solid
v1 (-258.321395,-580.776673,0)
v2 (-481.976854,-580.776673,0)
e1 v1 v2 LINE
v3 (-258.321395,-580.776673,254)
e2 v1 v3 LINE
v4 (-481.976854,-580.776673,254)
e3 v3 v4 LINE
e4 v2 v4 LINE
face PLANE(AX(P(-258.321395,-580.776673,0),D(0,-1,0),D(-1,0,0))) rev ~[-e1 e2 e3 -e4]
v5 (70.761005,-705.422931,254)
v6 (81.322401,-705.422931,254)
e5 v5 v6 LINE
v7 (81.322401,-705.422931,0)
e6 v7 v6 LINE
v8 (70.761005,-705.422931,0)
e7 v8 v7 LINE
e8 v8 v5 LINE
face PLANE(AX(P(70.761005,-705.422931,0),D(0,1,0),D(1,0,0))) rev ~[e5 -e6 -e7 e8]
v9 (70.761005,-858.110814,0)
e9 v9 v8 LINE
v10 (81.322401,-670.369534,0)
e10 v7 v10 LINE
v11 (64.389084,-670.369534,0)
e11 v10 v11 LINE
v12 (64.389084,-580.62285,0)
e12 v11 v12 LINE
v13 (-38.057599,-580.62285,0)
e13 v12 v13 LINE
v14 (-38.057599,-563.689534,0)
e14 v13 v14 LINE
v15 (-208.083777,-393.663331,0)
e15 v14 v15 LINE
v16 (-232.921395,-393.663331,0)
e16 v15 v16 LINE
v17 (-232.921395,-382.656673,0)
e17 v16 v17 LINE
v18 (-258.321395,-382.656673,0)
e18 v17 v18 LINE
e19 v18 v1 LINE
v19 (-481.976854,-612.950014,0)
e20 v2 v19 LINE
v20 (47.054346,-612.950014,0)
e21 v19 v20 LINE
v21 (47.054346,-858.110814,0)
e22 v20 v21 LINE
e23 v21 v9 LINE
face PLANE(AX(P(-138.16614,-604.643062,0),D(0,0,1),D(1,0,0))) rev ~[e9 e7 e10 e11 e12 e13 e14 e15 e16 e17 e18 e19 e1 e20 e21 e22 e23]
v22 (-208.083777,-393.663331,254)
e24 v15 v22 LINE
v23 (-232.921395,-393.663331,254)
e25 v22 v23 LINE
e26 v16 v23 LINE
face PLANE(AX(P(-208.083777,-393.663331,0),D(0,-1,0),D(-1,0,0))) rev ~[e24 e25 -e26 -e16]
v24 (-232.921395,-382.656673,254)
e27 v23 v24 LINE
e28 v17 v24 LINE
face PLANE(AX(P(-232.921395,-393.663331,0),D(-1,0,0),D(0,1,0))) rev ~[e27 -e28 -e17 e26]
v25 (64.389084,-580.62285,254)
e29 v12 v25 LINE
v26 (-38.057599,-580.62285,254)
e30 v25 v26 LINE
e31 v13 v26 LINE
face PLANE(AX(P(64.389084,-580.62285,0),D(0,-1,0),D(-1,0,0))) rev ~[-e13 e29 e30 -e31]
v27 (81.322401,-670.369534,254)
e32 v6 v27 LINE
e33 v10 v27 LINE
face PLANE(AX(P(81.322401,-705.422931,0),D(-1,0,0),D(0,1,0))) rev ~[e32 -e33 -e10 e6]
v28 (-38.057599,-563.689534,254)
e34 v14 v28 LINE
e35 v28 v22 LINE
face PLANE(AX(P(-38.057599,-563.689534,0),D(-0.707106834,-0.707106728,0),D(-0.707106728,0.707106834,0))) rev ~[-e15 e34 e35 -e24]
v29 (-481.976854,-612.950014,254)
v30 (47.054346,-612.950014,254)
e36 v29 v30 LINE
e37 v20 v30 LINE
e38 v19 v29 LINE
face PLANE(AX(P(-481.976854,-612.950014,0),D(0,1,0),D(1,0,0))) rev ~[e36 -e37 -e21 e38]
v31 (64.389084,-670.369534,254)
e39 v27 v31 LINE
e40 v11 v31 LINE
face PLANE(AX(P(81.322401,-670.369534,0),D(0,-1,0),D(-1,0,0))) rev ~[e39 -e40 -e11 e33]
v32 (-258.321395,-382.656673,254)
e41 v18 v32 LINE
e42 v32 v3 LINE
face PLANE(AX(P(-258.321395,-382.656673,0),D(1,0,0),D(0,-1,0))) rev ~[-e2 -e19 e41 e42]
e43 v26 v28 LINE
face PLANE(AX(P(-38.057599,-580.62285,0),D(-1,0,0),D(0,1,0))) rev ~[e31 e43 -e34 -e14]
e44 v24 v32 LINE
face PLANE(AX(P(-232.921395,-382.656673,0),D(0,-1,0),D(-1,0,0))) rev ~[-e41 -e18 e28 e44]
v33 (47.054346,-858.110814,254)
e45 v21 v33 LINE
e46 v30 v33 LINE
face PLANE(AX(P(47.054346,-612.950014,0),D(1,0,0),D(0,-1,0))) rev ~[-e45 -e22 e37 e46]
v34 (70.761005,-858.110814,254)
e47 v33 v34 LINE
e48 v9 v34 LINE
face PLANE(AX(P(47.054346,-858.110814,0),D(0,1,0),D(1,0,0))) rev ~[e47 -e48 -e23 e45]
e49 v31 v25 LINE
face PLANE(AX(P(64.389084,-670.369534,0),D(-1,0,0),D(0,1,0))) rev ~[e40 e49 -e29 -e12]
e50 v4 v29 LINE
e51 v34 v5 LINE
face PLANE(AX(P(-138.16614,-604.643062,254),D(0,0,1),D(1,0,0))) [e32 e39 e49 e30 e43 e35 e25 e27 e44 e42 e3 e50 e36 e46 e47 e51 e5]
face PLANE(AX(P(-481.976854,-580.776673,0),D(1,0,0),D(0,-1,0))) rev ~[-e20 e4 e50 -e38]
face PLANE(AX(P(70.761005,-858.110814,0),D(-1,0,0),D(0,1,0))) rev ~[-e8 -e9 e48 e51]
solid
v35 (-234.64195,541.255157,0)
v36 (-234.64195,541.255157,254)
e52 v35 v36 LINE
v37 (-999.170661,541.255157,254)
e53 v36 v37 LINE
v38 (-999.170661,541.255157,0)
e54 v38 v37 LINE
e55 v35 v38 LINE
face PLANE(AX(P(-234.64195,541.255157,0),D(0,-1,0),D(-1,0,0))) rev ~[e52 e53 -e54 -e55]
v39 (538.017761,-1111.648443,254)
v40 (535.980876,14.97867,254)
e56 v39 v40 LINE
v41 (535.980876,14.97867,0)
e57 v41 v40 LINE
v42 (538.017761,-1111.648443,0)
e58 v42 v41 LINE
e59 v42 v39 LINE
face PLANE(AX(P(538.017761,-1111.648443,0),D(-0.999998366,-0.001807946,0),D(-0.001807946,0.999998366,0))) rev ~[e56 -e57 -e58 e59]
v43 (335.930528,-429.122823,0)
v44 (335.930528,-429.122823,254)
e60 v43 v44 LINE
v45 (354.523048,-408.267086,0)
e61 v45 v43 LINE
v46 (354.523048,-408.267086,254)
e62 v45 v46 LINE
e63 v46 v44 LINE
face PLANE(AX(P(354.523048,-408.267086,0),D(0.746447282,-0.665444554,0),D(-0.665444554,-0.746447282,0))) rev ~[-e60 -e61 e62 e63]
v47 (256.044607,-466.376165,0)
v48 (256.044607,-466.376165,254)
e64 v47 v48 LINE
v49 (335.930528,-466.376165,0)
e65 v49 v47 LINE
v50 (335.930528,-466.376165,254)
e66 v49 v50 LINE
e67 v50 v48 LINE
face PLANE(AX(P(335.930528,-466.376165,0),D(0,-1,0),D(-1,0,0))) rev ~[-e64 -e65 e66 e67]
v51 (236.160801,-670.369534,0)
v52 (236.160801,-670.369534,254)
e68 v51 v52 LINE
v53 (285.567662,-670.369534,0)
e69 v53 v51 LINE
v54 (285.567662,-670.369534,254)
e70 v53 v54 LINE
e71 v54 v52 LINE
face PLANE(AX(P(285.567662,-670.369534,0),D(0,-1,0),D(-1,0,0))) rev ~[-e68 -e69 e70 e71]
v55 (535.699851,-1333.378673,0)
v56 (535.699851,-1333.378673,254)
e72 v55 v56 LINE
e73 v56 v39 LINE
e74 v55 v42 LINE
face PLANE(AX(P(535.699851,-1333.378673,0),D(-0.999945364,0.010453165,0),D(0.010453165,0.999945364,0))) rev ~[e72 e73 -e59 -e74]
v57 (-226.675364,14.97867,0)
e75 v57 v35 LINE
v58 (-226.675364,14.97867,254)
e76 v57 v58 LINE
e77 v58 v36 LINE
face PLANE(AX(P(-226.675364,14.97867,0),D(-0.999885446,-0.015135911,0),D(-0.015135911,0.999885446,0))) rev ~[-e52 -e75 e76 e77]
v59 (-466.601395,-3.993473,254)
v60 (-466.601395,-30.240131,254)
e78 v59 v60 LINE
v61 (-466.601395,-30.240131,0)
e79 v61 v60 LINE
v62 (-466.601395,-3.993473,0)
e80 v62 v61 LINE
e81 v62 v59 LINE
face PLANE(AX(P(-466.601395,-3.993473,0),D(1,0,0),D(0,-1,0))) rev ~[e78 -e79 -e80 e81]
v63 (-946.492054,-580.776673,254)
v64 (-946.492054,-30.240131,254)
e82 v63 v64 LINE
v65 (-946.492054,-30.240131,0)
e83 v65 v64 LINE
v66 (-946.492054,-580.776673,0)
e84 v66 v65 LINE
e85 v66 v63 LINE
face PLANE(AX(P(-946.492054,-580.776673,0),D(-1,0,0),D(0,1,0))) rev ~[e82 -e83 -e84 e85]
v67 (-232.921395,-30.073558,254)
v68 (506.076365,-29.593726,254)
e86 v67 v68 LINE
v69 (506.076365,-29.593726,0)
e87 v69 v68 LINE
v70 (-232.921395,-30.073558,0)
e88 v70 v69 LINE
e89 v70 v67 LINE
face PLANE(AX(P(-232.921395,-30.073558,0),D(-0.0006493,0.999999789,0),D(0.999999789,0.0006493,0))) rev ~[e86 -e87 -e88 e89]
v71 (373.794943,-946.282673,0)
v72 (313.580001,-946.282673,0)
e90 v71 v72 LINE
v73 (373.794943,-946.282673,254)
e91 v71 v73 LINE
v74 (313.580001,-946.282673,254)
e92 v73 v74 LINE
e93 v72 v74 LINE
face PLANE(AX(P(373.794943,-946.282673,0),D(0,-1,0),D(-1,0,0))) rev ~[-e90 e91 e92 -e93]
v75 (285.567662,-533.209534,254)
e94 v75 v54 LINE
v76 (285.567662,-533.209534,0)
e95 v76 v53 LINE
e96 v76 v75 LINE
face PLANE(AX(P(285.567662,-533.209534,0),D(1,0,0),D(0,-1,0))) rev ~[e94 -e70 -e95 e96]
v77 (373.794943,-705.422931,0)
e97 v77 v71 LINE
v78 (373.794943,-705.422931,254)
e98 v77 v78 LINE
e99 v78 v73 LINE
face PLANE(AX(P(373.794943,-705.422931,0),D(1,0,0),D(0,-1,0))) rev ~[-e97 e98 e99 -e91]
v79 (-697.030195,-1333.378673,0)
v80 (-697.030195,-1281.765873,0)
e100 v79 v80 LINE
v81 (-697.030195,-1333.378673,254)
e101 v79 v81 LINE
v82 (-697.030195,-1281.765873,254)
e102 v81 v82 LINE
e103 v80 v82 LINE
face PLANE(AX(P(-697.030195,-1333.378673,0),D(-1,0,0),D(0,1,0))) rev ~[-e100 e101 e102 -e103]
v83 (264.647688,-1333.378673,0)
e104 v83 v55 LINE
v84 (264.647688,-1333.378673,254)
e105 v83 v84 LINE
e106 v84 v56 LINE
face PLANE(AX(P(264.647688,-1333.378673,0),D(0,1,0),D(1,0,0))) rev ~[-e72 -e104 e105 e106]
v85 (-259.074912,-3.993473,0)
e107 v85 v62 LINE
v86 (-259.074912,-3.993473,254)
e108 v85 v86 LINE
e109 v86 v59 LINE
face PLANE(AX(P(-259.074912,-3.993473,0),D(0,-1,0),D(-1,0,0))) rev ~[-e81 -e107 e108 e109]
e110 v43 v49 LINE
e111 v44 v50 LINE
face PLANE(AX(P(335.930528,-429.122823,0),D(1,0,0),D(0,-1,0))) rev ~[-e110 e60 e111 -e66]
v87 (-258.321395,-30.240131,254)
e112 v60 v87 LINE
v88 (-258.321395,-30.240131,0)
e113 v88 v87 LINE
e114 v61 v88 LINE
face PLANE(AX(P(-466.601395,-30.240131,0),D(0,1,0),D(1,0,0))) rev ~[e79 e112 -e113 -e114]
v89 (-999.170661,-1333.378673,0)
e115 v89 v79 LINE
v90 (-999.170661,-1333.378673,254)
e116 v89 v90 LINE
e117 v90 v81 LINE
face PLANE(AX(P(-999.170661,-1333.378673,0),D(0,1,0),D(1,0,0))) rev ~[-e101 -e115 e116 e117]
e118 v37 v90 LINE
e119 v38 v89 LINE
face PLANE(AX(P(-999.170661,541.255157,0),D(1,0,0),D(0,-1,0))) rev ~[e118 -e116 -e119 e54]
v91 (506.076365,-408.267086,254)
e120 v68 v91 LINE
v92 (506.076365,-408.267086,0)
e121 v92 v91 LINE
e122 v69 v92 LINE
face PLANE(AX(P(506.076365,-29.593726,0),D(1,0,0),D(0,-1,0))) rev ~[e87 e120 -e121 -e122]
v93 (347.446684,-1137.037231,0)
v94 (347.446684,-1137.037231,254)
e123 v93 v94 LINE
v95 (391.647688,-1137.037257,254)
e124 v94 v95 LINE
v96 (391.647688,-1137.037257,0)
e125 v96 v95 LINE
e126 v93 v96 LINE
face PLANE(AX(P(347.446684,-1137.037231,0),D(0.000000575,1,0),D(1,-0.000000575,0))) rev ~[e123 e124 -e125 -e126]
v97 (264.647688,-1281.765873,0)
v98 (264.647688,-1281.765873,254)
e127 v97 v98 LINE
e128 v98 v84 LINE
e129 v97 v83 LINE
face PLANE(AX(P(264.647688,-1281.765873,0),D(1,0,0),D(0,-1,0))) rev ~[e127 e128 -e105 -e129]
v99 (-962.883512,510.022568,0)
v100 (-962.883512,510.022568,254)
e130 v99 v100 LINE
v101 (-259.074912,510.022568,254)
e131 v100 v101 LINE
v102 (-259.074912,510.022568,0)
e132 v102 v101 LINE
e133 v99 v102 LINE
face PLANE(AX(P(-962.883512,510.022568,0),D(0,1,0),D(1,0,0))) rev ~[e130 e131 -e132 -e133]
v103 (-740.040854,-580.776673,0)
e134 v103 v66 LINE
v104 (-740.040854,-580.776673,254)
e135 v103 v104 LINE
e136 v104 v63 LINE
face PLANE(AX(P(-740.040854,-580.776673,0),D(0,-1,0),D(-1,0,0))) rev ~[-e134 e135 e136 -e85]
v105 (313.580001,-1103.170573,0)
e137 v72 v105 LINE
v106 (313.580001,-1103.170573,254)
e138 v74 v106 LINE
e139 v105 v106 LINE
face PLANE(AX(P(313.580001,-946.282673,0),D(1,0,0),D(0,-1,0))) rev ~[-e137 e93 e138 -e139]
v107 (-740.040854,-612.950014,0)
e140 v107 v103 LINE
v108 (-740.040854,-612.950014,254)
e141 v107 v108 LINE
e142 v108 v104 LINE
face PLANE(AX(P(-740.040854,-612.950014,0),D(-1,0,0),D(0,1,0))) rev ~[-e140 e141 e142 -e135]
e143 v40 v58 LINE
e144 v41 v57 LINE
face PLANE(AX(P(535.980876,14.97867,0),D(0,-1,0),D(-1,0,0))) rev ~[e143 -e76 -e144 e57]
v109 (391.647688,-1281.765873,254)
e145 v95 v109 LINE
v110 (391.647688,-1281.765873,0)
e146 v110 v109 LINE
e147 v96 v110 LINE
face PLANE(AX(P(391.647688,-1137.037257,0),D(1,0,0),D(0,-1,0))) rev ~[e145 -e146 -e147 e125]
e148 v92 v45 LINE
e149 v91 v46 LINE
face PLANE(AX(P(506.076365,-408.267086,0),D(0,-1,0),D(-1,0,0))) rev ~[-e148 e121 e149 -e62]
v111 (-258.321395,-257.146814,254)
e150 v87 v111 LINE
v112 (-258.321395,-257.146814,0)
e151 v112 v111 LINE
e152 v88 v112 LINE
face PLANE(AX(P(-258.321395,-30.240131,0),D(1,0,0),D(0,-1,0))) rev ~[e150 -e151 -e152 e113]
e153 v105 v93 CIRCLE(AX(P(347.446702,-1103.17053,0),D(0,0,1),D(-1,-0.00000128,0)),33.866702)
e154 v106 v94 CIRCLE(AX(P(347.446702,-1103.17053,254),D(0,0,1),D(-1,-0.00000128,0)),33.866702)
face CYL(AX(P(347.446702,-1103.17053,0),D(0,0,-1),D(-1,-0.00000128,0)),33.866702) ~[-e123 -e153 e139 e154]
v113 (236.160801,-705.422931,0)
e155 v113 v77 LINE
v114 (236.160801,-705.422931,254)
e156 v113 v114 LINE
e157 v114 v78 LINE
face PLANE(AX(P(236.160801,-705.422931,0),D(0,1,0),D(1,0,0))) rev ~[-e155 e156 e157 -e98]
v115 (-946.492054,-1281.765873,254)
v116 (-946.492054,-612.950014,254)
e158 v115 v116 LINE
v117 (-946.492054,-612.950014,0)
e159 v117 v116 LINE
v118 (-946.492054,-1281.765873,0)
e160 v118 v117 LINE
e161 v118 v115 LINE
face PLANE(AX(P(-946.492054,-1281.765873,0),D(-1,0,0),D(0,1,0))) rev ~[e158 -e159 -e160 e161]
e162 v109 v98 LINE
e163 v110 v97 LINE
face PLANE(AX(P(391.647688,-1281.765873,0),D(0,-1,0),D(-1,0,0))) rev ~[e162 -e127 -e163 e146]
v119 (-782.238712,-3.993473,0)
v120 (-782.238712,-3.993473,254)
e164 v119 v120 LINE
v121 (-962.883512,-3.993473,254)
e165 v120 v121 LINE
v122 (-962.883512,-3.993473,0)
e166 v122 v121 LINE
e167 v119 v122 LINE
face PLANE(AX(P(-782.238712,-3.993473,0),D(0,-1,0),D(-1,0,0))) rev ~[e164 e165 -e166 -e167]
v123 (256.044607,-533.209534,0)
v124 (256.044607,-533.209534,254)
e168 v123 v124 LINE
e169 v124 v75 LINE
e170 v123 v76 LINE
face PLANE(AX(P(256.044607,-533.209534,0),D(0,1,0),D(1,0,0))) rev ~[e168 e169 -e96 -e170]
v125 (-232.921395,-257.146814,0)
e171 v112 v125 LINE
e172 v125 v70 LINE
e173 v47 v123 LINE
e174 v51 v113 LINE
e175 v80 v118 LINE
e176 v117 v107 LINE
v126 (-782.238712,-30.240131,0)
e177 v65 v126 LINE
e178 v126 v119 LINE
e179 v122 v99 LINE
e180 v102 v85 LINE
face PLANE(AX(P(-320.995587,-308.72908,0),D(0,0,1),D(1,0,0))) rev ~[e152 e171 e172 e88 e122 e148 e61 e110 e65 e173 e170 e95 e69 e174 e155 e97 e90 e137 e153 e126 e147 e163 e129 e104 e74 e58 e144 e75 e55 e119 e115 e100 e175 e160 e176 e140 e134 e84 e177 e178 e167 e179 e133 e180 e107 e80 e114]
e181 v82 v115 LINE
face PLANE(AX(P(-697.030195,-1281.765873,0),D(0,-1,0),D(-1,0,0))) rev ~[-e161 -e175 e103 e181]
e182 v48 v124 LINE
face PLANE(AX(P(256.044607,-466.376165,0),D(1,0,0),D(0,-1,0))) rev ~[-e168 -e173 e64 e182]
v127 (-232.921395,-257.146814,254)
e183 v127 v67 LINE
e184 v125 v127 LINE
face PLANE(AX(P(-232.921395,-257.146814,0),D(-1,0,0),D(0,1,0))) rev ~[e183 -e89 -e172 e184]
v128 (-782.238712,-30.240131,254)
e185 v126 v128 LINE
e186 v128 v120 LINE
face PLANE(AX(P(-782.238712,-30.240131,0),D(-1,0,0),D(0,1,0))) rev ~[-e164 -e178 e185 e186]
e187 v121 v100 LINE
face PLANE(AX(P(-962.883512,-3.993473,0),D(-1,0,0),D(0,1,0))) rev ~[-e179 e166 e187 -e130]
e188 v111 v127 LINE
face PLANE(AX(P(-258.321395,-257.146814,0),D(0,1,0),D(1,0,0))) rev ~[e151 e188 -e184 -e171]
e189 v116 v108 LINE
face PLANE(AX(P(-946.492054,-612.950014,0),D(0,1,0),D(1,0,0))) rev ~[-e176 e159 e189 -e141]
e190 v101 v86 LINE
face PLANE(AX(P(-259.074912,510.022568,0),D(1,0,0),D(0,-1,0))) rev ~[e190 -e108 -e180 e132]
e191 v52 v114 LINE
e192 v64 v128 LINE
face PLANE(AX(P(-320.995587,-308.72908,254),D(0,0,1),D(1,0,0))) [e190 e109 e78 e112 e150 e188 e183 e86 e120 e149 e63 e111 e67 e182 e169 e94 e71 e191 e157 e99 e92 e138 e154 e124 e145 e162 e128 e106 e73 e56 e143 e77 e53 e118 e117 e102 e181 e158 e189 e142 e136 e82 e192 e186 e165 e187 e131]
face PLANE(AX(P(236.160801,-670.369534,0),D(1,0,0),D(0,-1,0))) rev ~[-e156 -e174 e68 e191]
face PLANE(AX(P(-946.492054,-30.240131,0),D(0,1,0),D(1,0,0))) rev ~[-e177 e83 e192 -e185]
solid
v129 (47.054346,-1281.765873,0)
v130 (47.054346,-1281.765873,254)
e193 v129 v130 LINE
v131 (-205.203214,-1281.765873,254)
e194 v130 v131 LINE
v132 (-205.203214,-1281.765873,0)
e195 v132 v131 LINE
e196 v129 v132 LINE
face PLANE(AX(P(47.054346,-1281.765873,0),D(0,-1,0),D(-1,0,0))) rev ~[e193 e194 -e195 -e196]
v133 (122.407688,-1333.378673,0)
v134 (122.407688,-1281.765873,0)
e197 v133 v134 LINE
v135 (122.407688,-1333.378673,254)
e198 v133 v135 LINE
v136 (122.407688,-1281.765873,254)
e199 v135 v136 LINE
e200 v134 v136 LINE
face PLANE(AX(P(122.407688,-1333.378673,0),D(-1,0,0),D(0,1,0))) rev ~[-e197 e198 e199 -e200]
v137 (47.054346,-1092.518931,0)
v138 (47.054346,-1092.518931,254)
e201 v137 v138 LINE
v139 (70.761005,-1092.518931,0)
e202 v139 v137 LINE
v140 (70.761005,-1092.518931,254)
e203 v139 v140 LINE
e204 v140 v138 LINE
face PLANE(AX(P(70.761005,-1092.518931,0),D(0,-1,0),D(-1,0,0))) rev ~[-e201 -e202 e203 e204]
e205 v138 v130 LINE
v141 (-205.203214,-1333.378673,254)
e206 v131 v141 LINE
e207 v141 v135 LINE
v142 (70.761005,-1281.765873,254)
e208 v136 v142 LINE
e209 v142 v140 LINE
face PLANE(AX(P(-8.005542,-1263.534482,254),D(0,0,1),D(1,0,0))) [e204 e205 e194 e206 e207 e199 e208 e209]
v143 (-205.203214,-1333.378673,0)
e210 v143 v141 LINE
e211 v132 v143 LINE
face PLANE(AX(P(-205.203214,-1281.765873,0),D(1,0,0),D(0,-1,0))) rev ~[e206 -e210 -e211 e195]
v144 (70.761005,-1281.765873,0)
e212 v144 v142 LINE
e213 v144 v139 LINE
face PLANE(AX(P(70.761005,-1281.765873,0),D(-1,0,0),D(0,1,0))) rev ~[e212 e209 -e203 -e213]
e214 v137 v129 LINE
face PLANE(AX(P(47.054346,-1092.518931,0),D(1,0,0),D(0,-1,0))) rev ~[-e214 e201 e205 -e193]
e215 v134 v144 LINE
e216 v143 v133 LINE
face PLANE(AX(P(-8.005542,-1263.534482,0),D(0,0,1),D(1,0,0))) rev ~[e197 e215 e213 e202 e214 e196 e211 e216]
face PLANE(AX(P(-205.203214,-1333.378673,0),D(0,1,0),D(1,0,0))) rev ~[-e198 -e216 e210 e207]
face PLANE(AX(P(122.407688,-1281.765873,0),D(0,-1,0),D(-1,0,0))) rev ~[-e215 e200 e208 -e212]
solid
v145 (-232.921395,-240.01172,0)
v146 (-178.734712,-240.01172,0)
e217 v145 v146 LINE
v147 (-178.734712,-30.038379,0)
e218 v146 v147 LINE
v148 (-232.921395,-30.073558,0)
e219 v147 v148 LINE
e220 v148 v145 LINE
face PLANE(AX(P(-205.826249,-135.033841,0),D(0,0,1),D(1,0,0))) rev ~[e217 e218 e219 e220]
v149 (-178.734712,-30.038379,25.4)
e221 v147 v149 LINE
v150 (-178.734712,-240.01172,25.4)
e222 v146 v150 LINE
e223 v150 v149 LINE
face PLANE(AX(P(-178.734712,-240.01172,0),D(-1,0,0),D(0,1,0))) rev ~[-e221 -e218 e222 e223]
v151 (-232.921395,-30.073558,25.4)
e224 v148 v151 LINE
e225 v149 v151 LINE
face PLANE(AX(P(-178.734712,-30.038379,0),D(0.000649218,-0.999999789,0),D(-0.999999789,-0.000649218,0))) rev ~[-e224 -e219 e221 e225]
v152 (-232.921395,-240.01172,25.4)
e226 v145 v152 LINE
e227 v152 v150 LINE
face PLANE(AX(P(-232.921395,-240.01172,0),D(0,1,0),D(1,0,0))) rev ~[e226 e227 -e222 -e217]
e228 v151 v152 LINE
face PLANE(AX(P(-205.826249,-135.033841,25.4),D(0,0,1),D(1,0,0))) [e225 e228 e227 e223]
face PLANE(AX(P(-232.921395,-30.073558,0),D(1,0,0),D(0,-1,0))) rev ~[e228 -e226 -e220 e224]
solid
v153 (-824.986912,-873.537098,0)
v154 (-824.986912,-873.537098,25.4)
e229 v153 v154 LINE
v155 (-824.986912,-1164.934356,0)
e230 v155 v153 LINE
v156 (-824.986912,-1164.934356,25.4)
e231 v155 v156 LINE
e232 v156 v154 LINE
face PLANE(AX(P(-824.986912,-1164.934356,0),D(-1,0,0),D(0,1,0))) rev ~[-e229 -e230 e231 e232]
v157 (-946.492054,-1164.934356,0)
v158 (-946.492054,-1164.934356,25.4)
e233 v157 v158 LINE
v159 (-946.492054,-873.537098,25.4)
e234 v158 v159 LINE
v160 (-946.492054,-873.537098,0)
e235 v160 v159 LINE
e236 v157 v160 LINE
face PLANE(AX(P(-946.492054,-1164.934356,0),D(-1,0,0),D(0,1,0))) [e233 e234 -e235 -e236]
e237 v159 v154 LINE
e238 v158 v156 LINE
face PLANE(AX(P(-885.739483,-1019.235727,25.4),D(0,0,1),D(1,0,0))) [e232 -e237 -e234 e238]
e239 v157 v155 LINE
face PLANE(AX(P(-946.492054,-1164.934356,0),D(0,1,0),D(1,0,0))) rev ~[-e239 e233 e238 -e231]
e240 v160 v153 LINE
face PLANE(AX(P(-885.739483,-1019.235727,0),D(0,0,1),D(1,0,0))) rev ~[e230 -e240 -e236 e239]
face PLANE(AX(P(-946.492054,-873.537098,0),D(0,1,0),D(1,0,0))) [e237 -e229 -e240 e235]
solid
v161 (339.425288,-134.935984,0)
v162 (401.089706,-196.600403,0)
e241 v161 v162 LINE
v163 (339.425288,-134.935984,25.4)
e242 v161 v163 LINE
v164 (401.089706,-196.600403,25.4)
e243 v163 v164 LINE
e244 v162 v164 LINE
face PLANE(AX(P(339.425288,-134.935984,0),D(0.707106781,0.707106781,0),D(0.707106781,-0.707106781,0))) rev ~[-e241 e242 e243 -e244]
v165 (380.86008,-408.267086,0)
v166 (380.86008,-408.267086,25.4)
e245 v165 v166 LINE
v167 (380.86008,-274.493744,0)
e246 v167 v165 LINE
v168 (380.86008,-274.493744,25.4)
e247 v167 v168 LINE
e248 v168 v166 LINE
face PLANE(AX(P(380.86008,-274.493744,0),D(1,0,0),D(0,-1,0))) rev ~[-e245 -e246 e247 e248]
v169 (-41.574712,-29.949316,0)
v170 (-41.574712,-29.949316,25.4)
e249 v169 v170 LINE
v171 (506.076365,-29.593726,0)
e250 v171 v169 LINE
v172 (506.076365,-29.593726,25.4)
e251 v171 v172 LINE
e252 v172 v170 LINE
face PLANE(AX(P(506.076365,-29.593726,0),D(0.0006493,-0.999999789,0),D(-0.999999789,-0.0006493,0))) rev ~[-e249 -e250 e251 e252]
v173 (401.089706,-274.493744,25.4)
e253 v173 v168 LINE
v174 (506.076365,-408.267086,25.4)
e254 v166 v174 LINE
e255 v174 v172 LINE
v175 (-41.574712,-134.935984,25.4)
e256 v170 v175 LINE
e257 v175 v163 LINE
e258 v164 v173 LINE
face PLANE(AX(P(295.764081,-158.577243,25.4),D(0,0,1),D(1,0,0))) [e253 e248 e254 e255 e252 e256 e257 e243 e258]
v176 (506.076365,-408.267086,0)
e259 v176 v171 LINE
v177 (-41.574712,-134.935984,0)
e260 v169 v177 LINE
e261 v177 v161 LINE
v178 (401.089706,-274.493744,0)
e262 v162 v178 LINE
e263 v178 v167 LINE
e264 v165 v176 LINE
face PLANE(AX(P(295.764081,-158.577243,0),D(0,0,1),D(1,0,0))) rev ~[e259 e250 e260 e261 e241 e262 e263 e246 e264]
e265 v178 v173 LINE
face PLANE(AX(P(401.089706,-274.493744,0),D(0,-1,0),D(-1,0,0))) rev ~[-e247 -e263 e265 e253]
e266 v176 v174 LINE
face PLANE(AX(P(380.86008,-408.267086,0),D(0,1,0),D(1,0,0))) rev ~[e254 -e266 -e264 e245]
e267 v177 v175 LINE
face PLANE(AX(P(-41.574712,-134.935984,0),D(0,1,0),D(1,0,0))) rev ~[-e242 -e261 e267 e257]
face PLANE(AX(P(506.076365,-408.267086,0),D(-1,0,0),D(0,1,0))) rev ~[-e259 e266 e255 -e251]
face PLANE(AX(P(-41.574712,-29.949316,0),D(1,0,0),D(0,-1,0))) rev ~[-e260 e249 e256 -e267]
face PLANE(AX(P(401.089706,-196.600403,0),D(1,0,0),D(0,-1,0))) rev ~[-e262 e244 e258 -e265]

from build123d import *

# Parameters (mm, degrees)
F2_DEPTH = 254
F3_DEPTH = 25.4
F1_W     = 121.5051418
F1_H     = 291.3972582
F4_DEPTH = 25.4


# Not quite as in the source:
# - ends of sketch curves that miss each other by under 0.0002 mm in the source are joined


with BuildPart() as f2:
    # F1 (on face) → F2 (new body)
    with BuildSketch(Plane.XY):
        with BuildLine():
            Line((313.5800008442, -946.2826725998), (313.5800008442, -1103.1705731998))
            ThreePointArc((313.5800008442, -1103.1705731998), (323.4993407748, -1127.1179168691), (347.4466844442, -1137.0372313998))
            Line((347.4466844442, -1137.0372313998), (391.6476882442, -1137.0372567998))
            Line((391.6476882442, -1137.0372567998), (391.6476882442, -1281.7658725998))
            Line((391.6476882442, -1281.7658725998), (264.6476882442, -1281.7658725998))
            Line((264.6476882442, -1281.7658725998), (264.6476882442, -1333.3786725998))
            Line((264.6476882442, -1333.3786725998), (535.6998512442, -1333.3786725998))
            Line((535.6998512442, -1333.3786725998), (538.0177605074, -1111.6484430823))
            Line((538.0177605074, -1111.6484430823), (535.9808760803, 14.9786700639))
            Line((535.9808760803, 14.9786700639), (-226.6753639778, 14.9786700639))
            Line((-226.6753639778, 14.9786700639), (-234.6419504656, 541.2551566362))
            Line((-234.6419504656, 541.2551566362), (-999.1706609726, 541.2551566362))
            Line((-999.1706609726, 541.2551566362), (-999.1706609726, -1333.3786725998))
            Line((-999.1706609726, -1333.3786725998), (-697.0301953558, -1333.3786725998))
            Line((-697.0301953558, -1333.3786725998), (-697.0301953558, -1281.7658725998))
            Line((-697.0301953558, -1281.7658725998), (-946.4920535558, -1281.7658725998))
            Line((-946.4920535558, -1281.7658725998), (-946.4920535558, -1164.9343561998))
            Line((-946.4920535558, -1164.9343561998), (-946.4920535558, -873.5370979998))
            Line((-946.4920535558, -873.5370979998), (-946.4920535558, -612.9500143998))
            Line((-946.4920535558, -612.9500143998), (-740.0408535558, -612.9500143998))
            Line((-740.0408535558, -612.9500143998), (-740.0408535558, -587.1436143998))
            Line((-740.0408535558, -587.1436143998), (-740.0408535558, -580.7766725998))
            Line((-740.0408535558, -580.7766725998), (-946.4920535558, -580.7766725998))
            Line((-946.4920535558, -580.7766725998), (-946.4920535558, -30.2401307998))
            Line((-946.4920535558, -30.2401307998), (-782.2387117558, -30.2401307998))
            Line((-782.2387117558, -30.2401307998), (-782.2387117558, -3.9934725998))
            Line((-782.2387117558, -3.9934725998), (-962.8835117558, -3.9934725998))
            Line((-962.8835117558, -3.9934725998), (-962.8835117558, 510.0225682002))
            Line((-962.8835117558, 510.0225682002), (-259.0749117558, 510.0225682002))
            Line((-259.0749117558, 510.0225682002), (-259.0749117558, -3.9934725998))
            Line((-259.0749117558, -3.9934725998), (-466.6013953558, -3.9934725998))
            Line((-466.6013953558, -3.9934725998), (-466.6013953558, -30.2401307998))
            Line((-466.6013953558, -30.2401307998), (-258.3213953558, -30.2401307998))
            Line((-258.3213953558, -30.2401307998), (-258.3213953558, -257.1468143998))
            Line((-258.3213953558, -257.1468143998), (-232.9213953558, -257.1468143998))
            Line((-232.9213953558, -257.1468143998), (-232.9213953558, -240.0117203998))
            Line((-232.9213953558, -240.0117203998), (-232.9213953558, -30.0735575998))
            Line((-232.9213953558, -30.0735575998), (-178.7347117587, -30.0383741748))
            Line((-178.7347117587, -30.0383741748), (-41.5747117624, -29.9493161581))
            Line((-41.5747117624, -29.9493161581), (506.0763646442, -29.5937261998))
            Line((506.0763646442, -29.5937261998), (506.0763646442, -408.2670861998))
            Line((506.0763646442, -408.2670861998), (380.8600796442, -408.2670861998))
            Line((380.8600796442, -408.2670861998), (354.5230482442, -408.2670861998))
            Line((354.5230482442, -408.2670861998), (335.9305276442, -429.1228229998))
            Line((335.9305276442, -429.1228229998), (335.9305276442, -466.3761647998))
            Line((335.9305276442, -466.3761647998), (256.0446066442, -466.3761647998))
            Line((256.0446066442, -466.3761647998), (256.0446066442, -533.2095337998))
            Line((256.0446066442, -533.2095337998), (285.5676616442, -533.2095337998))
            Line((285.5676616442, -533.2095337998), (285.5676616442, -670.3695337998))
            Line((285.5676616442, -670.3695337998), (236.1608008442, -670.3695337998))
            Line((236.1608008442, -670.3695337998), (236.1608008442, -705.4229307998))
            Line((236.1608008442, -705.4229307998), (373.7949426442, -705.4229307998))
            Line((373.7949426442, -705.4229307998), (373.7949426442, -946.2826725998))
            Line((373.7949426442, -946.2826725998), (313.5800008442, -946.2826725998))
        make_face()
    extrude(amount=F2_DEPTH)


with BuildPart() as f2b:
    # F1 (on face) → F2, piece 2 (new body)
    with BuildSketch(Plane.XY):
        Polygon((-258.3213953558, -382.6566725998), (-258.3213953558, -580.7766725998), (-481.9768535558, -580.7766725998), (-481.9768535558, -612.9500143998), (47.0543464442, -612.9500143998), (47.0543464442, -858.1108143998), (70.7610046442, -858.1108143998), (70.7610046442, -705.4229307998), (81.3224008442, -705.4229307998), (81.3224008442, -670.3695337998), (64.3890844442, -670.3695337998), (64.3890844442, -580.6228501998), (-38.0575991558, -580.6228501998), (-38.0575991558, -563.6895337998), (-208.0837767558, -393.6633307998), (-232.9213953558, -393.6633307998), (-232.9213953558, -382.6566725998), align=None)
    extrude(amount=F2_DEPTH)


with BuildPart() as f2c:
    # F1 (on face) → F2, piece 3 (new body)
    with BuildSketch(Plane.XY):
        Polygon((-205.2032135558, -1333.3786725998), (122.4076882442, -1333.3786725998), (122.4076882442, -1281.7658725998), (70.7610046442, -1281.7658725998), (70.7610046442, -1092.5189307998), (47.0543464442, -1092.5189307998), (47.0543464442, -1281.7658725998), (-205.2032135558, -1281.7658725998), align=None)
    extrude(amount=F2_DEPTH)


with BuildPart() as f3:
    # F1 (on face) → F3 (new body)
    with BuildSketch(Plane.XY):
        Polygon((380.8600796442, -274.4937443998), (380.8600796442, -408.2670861998), (506.0763646442, -408.2670861998), (506.0763646442, -29.5937261998), (-41.5747117624, -29.9493161581), (-41.5747117558, -134.9359843998), (339.4252882442, -134.9359843998), (401.0897064442, -196.6004025998), (401.0897064442, -274.4937443998), align=None)
    extrude(amount=F3_DEPTH)


with BuildPart() as f3b:
    # F1 (on face) → F3, piece 2 (new body)
    with BuildSketch(Plane.XY):
        Polygon((-178.7347117558, -240.0117203998), (-178.7347117558, -30.0383785998), (-232.9213953558, -30.0735575998), (-232.9213953558, -240.0117203998), align=None)
    extrude(amount=F3_DEPTH)


with BuildPart() as f4:
    # F1 (on face) → F4 (new body)
    with BuildSketch(Plane.XY):
        with Locations((-885.7394826558, -1019.2357270998)):
            Rectangle(F1_W, F1_H)
    extrude(amount=F4_DEPTH)


solid = Compound([f2.part, f2b.part, f2c.part, f3.part, f3b.part, f4.part])
